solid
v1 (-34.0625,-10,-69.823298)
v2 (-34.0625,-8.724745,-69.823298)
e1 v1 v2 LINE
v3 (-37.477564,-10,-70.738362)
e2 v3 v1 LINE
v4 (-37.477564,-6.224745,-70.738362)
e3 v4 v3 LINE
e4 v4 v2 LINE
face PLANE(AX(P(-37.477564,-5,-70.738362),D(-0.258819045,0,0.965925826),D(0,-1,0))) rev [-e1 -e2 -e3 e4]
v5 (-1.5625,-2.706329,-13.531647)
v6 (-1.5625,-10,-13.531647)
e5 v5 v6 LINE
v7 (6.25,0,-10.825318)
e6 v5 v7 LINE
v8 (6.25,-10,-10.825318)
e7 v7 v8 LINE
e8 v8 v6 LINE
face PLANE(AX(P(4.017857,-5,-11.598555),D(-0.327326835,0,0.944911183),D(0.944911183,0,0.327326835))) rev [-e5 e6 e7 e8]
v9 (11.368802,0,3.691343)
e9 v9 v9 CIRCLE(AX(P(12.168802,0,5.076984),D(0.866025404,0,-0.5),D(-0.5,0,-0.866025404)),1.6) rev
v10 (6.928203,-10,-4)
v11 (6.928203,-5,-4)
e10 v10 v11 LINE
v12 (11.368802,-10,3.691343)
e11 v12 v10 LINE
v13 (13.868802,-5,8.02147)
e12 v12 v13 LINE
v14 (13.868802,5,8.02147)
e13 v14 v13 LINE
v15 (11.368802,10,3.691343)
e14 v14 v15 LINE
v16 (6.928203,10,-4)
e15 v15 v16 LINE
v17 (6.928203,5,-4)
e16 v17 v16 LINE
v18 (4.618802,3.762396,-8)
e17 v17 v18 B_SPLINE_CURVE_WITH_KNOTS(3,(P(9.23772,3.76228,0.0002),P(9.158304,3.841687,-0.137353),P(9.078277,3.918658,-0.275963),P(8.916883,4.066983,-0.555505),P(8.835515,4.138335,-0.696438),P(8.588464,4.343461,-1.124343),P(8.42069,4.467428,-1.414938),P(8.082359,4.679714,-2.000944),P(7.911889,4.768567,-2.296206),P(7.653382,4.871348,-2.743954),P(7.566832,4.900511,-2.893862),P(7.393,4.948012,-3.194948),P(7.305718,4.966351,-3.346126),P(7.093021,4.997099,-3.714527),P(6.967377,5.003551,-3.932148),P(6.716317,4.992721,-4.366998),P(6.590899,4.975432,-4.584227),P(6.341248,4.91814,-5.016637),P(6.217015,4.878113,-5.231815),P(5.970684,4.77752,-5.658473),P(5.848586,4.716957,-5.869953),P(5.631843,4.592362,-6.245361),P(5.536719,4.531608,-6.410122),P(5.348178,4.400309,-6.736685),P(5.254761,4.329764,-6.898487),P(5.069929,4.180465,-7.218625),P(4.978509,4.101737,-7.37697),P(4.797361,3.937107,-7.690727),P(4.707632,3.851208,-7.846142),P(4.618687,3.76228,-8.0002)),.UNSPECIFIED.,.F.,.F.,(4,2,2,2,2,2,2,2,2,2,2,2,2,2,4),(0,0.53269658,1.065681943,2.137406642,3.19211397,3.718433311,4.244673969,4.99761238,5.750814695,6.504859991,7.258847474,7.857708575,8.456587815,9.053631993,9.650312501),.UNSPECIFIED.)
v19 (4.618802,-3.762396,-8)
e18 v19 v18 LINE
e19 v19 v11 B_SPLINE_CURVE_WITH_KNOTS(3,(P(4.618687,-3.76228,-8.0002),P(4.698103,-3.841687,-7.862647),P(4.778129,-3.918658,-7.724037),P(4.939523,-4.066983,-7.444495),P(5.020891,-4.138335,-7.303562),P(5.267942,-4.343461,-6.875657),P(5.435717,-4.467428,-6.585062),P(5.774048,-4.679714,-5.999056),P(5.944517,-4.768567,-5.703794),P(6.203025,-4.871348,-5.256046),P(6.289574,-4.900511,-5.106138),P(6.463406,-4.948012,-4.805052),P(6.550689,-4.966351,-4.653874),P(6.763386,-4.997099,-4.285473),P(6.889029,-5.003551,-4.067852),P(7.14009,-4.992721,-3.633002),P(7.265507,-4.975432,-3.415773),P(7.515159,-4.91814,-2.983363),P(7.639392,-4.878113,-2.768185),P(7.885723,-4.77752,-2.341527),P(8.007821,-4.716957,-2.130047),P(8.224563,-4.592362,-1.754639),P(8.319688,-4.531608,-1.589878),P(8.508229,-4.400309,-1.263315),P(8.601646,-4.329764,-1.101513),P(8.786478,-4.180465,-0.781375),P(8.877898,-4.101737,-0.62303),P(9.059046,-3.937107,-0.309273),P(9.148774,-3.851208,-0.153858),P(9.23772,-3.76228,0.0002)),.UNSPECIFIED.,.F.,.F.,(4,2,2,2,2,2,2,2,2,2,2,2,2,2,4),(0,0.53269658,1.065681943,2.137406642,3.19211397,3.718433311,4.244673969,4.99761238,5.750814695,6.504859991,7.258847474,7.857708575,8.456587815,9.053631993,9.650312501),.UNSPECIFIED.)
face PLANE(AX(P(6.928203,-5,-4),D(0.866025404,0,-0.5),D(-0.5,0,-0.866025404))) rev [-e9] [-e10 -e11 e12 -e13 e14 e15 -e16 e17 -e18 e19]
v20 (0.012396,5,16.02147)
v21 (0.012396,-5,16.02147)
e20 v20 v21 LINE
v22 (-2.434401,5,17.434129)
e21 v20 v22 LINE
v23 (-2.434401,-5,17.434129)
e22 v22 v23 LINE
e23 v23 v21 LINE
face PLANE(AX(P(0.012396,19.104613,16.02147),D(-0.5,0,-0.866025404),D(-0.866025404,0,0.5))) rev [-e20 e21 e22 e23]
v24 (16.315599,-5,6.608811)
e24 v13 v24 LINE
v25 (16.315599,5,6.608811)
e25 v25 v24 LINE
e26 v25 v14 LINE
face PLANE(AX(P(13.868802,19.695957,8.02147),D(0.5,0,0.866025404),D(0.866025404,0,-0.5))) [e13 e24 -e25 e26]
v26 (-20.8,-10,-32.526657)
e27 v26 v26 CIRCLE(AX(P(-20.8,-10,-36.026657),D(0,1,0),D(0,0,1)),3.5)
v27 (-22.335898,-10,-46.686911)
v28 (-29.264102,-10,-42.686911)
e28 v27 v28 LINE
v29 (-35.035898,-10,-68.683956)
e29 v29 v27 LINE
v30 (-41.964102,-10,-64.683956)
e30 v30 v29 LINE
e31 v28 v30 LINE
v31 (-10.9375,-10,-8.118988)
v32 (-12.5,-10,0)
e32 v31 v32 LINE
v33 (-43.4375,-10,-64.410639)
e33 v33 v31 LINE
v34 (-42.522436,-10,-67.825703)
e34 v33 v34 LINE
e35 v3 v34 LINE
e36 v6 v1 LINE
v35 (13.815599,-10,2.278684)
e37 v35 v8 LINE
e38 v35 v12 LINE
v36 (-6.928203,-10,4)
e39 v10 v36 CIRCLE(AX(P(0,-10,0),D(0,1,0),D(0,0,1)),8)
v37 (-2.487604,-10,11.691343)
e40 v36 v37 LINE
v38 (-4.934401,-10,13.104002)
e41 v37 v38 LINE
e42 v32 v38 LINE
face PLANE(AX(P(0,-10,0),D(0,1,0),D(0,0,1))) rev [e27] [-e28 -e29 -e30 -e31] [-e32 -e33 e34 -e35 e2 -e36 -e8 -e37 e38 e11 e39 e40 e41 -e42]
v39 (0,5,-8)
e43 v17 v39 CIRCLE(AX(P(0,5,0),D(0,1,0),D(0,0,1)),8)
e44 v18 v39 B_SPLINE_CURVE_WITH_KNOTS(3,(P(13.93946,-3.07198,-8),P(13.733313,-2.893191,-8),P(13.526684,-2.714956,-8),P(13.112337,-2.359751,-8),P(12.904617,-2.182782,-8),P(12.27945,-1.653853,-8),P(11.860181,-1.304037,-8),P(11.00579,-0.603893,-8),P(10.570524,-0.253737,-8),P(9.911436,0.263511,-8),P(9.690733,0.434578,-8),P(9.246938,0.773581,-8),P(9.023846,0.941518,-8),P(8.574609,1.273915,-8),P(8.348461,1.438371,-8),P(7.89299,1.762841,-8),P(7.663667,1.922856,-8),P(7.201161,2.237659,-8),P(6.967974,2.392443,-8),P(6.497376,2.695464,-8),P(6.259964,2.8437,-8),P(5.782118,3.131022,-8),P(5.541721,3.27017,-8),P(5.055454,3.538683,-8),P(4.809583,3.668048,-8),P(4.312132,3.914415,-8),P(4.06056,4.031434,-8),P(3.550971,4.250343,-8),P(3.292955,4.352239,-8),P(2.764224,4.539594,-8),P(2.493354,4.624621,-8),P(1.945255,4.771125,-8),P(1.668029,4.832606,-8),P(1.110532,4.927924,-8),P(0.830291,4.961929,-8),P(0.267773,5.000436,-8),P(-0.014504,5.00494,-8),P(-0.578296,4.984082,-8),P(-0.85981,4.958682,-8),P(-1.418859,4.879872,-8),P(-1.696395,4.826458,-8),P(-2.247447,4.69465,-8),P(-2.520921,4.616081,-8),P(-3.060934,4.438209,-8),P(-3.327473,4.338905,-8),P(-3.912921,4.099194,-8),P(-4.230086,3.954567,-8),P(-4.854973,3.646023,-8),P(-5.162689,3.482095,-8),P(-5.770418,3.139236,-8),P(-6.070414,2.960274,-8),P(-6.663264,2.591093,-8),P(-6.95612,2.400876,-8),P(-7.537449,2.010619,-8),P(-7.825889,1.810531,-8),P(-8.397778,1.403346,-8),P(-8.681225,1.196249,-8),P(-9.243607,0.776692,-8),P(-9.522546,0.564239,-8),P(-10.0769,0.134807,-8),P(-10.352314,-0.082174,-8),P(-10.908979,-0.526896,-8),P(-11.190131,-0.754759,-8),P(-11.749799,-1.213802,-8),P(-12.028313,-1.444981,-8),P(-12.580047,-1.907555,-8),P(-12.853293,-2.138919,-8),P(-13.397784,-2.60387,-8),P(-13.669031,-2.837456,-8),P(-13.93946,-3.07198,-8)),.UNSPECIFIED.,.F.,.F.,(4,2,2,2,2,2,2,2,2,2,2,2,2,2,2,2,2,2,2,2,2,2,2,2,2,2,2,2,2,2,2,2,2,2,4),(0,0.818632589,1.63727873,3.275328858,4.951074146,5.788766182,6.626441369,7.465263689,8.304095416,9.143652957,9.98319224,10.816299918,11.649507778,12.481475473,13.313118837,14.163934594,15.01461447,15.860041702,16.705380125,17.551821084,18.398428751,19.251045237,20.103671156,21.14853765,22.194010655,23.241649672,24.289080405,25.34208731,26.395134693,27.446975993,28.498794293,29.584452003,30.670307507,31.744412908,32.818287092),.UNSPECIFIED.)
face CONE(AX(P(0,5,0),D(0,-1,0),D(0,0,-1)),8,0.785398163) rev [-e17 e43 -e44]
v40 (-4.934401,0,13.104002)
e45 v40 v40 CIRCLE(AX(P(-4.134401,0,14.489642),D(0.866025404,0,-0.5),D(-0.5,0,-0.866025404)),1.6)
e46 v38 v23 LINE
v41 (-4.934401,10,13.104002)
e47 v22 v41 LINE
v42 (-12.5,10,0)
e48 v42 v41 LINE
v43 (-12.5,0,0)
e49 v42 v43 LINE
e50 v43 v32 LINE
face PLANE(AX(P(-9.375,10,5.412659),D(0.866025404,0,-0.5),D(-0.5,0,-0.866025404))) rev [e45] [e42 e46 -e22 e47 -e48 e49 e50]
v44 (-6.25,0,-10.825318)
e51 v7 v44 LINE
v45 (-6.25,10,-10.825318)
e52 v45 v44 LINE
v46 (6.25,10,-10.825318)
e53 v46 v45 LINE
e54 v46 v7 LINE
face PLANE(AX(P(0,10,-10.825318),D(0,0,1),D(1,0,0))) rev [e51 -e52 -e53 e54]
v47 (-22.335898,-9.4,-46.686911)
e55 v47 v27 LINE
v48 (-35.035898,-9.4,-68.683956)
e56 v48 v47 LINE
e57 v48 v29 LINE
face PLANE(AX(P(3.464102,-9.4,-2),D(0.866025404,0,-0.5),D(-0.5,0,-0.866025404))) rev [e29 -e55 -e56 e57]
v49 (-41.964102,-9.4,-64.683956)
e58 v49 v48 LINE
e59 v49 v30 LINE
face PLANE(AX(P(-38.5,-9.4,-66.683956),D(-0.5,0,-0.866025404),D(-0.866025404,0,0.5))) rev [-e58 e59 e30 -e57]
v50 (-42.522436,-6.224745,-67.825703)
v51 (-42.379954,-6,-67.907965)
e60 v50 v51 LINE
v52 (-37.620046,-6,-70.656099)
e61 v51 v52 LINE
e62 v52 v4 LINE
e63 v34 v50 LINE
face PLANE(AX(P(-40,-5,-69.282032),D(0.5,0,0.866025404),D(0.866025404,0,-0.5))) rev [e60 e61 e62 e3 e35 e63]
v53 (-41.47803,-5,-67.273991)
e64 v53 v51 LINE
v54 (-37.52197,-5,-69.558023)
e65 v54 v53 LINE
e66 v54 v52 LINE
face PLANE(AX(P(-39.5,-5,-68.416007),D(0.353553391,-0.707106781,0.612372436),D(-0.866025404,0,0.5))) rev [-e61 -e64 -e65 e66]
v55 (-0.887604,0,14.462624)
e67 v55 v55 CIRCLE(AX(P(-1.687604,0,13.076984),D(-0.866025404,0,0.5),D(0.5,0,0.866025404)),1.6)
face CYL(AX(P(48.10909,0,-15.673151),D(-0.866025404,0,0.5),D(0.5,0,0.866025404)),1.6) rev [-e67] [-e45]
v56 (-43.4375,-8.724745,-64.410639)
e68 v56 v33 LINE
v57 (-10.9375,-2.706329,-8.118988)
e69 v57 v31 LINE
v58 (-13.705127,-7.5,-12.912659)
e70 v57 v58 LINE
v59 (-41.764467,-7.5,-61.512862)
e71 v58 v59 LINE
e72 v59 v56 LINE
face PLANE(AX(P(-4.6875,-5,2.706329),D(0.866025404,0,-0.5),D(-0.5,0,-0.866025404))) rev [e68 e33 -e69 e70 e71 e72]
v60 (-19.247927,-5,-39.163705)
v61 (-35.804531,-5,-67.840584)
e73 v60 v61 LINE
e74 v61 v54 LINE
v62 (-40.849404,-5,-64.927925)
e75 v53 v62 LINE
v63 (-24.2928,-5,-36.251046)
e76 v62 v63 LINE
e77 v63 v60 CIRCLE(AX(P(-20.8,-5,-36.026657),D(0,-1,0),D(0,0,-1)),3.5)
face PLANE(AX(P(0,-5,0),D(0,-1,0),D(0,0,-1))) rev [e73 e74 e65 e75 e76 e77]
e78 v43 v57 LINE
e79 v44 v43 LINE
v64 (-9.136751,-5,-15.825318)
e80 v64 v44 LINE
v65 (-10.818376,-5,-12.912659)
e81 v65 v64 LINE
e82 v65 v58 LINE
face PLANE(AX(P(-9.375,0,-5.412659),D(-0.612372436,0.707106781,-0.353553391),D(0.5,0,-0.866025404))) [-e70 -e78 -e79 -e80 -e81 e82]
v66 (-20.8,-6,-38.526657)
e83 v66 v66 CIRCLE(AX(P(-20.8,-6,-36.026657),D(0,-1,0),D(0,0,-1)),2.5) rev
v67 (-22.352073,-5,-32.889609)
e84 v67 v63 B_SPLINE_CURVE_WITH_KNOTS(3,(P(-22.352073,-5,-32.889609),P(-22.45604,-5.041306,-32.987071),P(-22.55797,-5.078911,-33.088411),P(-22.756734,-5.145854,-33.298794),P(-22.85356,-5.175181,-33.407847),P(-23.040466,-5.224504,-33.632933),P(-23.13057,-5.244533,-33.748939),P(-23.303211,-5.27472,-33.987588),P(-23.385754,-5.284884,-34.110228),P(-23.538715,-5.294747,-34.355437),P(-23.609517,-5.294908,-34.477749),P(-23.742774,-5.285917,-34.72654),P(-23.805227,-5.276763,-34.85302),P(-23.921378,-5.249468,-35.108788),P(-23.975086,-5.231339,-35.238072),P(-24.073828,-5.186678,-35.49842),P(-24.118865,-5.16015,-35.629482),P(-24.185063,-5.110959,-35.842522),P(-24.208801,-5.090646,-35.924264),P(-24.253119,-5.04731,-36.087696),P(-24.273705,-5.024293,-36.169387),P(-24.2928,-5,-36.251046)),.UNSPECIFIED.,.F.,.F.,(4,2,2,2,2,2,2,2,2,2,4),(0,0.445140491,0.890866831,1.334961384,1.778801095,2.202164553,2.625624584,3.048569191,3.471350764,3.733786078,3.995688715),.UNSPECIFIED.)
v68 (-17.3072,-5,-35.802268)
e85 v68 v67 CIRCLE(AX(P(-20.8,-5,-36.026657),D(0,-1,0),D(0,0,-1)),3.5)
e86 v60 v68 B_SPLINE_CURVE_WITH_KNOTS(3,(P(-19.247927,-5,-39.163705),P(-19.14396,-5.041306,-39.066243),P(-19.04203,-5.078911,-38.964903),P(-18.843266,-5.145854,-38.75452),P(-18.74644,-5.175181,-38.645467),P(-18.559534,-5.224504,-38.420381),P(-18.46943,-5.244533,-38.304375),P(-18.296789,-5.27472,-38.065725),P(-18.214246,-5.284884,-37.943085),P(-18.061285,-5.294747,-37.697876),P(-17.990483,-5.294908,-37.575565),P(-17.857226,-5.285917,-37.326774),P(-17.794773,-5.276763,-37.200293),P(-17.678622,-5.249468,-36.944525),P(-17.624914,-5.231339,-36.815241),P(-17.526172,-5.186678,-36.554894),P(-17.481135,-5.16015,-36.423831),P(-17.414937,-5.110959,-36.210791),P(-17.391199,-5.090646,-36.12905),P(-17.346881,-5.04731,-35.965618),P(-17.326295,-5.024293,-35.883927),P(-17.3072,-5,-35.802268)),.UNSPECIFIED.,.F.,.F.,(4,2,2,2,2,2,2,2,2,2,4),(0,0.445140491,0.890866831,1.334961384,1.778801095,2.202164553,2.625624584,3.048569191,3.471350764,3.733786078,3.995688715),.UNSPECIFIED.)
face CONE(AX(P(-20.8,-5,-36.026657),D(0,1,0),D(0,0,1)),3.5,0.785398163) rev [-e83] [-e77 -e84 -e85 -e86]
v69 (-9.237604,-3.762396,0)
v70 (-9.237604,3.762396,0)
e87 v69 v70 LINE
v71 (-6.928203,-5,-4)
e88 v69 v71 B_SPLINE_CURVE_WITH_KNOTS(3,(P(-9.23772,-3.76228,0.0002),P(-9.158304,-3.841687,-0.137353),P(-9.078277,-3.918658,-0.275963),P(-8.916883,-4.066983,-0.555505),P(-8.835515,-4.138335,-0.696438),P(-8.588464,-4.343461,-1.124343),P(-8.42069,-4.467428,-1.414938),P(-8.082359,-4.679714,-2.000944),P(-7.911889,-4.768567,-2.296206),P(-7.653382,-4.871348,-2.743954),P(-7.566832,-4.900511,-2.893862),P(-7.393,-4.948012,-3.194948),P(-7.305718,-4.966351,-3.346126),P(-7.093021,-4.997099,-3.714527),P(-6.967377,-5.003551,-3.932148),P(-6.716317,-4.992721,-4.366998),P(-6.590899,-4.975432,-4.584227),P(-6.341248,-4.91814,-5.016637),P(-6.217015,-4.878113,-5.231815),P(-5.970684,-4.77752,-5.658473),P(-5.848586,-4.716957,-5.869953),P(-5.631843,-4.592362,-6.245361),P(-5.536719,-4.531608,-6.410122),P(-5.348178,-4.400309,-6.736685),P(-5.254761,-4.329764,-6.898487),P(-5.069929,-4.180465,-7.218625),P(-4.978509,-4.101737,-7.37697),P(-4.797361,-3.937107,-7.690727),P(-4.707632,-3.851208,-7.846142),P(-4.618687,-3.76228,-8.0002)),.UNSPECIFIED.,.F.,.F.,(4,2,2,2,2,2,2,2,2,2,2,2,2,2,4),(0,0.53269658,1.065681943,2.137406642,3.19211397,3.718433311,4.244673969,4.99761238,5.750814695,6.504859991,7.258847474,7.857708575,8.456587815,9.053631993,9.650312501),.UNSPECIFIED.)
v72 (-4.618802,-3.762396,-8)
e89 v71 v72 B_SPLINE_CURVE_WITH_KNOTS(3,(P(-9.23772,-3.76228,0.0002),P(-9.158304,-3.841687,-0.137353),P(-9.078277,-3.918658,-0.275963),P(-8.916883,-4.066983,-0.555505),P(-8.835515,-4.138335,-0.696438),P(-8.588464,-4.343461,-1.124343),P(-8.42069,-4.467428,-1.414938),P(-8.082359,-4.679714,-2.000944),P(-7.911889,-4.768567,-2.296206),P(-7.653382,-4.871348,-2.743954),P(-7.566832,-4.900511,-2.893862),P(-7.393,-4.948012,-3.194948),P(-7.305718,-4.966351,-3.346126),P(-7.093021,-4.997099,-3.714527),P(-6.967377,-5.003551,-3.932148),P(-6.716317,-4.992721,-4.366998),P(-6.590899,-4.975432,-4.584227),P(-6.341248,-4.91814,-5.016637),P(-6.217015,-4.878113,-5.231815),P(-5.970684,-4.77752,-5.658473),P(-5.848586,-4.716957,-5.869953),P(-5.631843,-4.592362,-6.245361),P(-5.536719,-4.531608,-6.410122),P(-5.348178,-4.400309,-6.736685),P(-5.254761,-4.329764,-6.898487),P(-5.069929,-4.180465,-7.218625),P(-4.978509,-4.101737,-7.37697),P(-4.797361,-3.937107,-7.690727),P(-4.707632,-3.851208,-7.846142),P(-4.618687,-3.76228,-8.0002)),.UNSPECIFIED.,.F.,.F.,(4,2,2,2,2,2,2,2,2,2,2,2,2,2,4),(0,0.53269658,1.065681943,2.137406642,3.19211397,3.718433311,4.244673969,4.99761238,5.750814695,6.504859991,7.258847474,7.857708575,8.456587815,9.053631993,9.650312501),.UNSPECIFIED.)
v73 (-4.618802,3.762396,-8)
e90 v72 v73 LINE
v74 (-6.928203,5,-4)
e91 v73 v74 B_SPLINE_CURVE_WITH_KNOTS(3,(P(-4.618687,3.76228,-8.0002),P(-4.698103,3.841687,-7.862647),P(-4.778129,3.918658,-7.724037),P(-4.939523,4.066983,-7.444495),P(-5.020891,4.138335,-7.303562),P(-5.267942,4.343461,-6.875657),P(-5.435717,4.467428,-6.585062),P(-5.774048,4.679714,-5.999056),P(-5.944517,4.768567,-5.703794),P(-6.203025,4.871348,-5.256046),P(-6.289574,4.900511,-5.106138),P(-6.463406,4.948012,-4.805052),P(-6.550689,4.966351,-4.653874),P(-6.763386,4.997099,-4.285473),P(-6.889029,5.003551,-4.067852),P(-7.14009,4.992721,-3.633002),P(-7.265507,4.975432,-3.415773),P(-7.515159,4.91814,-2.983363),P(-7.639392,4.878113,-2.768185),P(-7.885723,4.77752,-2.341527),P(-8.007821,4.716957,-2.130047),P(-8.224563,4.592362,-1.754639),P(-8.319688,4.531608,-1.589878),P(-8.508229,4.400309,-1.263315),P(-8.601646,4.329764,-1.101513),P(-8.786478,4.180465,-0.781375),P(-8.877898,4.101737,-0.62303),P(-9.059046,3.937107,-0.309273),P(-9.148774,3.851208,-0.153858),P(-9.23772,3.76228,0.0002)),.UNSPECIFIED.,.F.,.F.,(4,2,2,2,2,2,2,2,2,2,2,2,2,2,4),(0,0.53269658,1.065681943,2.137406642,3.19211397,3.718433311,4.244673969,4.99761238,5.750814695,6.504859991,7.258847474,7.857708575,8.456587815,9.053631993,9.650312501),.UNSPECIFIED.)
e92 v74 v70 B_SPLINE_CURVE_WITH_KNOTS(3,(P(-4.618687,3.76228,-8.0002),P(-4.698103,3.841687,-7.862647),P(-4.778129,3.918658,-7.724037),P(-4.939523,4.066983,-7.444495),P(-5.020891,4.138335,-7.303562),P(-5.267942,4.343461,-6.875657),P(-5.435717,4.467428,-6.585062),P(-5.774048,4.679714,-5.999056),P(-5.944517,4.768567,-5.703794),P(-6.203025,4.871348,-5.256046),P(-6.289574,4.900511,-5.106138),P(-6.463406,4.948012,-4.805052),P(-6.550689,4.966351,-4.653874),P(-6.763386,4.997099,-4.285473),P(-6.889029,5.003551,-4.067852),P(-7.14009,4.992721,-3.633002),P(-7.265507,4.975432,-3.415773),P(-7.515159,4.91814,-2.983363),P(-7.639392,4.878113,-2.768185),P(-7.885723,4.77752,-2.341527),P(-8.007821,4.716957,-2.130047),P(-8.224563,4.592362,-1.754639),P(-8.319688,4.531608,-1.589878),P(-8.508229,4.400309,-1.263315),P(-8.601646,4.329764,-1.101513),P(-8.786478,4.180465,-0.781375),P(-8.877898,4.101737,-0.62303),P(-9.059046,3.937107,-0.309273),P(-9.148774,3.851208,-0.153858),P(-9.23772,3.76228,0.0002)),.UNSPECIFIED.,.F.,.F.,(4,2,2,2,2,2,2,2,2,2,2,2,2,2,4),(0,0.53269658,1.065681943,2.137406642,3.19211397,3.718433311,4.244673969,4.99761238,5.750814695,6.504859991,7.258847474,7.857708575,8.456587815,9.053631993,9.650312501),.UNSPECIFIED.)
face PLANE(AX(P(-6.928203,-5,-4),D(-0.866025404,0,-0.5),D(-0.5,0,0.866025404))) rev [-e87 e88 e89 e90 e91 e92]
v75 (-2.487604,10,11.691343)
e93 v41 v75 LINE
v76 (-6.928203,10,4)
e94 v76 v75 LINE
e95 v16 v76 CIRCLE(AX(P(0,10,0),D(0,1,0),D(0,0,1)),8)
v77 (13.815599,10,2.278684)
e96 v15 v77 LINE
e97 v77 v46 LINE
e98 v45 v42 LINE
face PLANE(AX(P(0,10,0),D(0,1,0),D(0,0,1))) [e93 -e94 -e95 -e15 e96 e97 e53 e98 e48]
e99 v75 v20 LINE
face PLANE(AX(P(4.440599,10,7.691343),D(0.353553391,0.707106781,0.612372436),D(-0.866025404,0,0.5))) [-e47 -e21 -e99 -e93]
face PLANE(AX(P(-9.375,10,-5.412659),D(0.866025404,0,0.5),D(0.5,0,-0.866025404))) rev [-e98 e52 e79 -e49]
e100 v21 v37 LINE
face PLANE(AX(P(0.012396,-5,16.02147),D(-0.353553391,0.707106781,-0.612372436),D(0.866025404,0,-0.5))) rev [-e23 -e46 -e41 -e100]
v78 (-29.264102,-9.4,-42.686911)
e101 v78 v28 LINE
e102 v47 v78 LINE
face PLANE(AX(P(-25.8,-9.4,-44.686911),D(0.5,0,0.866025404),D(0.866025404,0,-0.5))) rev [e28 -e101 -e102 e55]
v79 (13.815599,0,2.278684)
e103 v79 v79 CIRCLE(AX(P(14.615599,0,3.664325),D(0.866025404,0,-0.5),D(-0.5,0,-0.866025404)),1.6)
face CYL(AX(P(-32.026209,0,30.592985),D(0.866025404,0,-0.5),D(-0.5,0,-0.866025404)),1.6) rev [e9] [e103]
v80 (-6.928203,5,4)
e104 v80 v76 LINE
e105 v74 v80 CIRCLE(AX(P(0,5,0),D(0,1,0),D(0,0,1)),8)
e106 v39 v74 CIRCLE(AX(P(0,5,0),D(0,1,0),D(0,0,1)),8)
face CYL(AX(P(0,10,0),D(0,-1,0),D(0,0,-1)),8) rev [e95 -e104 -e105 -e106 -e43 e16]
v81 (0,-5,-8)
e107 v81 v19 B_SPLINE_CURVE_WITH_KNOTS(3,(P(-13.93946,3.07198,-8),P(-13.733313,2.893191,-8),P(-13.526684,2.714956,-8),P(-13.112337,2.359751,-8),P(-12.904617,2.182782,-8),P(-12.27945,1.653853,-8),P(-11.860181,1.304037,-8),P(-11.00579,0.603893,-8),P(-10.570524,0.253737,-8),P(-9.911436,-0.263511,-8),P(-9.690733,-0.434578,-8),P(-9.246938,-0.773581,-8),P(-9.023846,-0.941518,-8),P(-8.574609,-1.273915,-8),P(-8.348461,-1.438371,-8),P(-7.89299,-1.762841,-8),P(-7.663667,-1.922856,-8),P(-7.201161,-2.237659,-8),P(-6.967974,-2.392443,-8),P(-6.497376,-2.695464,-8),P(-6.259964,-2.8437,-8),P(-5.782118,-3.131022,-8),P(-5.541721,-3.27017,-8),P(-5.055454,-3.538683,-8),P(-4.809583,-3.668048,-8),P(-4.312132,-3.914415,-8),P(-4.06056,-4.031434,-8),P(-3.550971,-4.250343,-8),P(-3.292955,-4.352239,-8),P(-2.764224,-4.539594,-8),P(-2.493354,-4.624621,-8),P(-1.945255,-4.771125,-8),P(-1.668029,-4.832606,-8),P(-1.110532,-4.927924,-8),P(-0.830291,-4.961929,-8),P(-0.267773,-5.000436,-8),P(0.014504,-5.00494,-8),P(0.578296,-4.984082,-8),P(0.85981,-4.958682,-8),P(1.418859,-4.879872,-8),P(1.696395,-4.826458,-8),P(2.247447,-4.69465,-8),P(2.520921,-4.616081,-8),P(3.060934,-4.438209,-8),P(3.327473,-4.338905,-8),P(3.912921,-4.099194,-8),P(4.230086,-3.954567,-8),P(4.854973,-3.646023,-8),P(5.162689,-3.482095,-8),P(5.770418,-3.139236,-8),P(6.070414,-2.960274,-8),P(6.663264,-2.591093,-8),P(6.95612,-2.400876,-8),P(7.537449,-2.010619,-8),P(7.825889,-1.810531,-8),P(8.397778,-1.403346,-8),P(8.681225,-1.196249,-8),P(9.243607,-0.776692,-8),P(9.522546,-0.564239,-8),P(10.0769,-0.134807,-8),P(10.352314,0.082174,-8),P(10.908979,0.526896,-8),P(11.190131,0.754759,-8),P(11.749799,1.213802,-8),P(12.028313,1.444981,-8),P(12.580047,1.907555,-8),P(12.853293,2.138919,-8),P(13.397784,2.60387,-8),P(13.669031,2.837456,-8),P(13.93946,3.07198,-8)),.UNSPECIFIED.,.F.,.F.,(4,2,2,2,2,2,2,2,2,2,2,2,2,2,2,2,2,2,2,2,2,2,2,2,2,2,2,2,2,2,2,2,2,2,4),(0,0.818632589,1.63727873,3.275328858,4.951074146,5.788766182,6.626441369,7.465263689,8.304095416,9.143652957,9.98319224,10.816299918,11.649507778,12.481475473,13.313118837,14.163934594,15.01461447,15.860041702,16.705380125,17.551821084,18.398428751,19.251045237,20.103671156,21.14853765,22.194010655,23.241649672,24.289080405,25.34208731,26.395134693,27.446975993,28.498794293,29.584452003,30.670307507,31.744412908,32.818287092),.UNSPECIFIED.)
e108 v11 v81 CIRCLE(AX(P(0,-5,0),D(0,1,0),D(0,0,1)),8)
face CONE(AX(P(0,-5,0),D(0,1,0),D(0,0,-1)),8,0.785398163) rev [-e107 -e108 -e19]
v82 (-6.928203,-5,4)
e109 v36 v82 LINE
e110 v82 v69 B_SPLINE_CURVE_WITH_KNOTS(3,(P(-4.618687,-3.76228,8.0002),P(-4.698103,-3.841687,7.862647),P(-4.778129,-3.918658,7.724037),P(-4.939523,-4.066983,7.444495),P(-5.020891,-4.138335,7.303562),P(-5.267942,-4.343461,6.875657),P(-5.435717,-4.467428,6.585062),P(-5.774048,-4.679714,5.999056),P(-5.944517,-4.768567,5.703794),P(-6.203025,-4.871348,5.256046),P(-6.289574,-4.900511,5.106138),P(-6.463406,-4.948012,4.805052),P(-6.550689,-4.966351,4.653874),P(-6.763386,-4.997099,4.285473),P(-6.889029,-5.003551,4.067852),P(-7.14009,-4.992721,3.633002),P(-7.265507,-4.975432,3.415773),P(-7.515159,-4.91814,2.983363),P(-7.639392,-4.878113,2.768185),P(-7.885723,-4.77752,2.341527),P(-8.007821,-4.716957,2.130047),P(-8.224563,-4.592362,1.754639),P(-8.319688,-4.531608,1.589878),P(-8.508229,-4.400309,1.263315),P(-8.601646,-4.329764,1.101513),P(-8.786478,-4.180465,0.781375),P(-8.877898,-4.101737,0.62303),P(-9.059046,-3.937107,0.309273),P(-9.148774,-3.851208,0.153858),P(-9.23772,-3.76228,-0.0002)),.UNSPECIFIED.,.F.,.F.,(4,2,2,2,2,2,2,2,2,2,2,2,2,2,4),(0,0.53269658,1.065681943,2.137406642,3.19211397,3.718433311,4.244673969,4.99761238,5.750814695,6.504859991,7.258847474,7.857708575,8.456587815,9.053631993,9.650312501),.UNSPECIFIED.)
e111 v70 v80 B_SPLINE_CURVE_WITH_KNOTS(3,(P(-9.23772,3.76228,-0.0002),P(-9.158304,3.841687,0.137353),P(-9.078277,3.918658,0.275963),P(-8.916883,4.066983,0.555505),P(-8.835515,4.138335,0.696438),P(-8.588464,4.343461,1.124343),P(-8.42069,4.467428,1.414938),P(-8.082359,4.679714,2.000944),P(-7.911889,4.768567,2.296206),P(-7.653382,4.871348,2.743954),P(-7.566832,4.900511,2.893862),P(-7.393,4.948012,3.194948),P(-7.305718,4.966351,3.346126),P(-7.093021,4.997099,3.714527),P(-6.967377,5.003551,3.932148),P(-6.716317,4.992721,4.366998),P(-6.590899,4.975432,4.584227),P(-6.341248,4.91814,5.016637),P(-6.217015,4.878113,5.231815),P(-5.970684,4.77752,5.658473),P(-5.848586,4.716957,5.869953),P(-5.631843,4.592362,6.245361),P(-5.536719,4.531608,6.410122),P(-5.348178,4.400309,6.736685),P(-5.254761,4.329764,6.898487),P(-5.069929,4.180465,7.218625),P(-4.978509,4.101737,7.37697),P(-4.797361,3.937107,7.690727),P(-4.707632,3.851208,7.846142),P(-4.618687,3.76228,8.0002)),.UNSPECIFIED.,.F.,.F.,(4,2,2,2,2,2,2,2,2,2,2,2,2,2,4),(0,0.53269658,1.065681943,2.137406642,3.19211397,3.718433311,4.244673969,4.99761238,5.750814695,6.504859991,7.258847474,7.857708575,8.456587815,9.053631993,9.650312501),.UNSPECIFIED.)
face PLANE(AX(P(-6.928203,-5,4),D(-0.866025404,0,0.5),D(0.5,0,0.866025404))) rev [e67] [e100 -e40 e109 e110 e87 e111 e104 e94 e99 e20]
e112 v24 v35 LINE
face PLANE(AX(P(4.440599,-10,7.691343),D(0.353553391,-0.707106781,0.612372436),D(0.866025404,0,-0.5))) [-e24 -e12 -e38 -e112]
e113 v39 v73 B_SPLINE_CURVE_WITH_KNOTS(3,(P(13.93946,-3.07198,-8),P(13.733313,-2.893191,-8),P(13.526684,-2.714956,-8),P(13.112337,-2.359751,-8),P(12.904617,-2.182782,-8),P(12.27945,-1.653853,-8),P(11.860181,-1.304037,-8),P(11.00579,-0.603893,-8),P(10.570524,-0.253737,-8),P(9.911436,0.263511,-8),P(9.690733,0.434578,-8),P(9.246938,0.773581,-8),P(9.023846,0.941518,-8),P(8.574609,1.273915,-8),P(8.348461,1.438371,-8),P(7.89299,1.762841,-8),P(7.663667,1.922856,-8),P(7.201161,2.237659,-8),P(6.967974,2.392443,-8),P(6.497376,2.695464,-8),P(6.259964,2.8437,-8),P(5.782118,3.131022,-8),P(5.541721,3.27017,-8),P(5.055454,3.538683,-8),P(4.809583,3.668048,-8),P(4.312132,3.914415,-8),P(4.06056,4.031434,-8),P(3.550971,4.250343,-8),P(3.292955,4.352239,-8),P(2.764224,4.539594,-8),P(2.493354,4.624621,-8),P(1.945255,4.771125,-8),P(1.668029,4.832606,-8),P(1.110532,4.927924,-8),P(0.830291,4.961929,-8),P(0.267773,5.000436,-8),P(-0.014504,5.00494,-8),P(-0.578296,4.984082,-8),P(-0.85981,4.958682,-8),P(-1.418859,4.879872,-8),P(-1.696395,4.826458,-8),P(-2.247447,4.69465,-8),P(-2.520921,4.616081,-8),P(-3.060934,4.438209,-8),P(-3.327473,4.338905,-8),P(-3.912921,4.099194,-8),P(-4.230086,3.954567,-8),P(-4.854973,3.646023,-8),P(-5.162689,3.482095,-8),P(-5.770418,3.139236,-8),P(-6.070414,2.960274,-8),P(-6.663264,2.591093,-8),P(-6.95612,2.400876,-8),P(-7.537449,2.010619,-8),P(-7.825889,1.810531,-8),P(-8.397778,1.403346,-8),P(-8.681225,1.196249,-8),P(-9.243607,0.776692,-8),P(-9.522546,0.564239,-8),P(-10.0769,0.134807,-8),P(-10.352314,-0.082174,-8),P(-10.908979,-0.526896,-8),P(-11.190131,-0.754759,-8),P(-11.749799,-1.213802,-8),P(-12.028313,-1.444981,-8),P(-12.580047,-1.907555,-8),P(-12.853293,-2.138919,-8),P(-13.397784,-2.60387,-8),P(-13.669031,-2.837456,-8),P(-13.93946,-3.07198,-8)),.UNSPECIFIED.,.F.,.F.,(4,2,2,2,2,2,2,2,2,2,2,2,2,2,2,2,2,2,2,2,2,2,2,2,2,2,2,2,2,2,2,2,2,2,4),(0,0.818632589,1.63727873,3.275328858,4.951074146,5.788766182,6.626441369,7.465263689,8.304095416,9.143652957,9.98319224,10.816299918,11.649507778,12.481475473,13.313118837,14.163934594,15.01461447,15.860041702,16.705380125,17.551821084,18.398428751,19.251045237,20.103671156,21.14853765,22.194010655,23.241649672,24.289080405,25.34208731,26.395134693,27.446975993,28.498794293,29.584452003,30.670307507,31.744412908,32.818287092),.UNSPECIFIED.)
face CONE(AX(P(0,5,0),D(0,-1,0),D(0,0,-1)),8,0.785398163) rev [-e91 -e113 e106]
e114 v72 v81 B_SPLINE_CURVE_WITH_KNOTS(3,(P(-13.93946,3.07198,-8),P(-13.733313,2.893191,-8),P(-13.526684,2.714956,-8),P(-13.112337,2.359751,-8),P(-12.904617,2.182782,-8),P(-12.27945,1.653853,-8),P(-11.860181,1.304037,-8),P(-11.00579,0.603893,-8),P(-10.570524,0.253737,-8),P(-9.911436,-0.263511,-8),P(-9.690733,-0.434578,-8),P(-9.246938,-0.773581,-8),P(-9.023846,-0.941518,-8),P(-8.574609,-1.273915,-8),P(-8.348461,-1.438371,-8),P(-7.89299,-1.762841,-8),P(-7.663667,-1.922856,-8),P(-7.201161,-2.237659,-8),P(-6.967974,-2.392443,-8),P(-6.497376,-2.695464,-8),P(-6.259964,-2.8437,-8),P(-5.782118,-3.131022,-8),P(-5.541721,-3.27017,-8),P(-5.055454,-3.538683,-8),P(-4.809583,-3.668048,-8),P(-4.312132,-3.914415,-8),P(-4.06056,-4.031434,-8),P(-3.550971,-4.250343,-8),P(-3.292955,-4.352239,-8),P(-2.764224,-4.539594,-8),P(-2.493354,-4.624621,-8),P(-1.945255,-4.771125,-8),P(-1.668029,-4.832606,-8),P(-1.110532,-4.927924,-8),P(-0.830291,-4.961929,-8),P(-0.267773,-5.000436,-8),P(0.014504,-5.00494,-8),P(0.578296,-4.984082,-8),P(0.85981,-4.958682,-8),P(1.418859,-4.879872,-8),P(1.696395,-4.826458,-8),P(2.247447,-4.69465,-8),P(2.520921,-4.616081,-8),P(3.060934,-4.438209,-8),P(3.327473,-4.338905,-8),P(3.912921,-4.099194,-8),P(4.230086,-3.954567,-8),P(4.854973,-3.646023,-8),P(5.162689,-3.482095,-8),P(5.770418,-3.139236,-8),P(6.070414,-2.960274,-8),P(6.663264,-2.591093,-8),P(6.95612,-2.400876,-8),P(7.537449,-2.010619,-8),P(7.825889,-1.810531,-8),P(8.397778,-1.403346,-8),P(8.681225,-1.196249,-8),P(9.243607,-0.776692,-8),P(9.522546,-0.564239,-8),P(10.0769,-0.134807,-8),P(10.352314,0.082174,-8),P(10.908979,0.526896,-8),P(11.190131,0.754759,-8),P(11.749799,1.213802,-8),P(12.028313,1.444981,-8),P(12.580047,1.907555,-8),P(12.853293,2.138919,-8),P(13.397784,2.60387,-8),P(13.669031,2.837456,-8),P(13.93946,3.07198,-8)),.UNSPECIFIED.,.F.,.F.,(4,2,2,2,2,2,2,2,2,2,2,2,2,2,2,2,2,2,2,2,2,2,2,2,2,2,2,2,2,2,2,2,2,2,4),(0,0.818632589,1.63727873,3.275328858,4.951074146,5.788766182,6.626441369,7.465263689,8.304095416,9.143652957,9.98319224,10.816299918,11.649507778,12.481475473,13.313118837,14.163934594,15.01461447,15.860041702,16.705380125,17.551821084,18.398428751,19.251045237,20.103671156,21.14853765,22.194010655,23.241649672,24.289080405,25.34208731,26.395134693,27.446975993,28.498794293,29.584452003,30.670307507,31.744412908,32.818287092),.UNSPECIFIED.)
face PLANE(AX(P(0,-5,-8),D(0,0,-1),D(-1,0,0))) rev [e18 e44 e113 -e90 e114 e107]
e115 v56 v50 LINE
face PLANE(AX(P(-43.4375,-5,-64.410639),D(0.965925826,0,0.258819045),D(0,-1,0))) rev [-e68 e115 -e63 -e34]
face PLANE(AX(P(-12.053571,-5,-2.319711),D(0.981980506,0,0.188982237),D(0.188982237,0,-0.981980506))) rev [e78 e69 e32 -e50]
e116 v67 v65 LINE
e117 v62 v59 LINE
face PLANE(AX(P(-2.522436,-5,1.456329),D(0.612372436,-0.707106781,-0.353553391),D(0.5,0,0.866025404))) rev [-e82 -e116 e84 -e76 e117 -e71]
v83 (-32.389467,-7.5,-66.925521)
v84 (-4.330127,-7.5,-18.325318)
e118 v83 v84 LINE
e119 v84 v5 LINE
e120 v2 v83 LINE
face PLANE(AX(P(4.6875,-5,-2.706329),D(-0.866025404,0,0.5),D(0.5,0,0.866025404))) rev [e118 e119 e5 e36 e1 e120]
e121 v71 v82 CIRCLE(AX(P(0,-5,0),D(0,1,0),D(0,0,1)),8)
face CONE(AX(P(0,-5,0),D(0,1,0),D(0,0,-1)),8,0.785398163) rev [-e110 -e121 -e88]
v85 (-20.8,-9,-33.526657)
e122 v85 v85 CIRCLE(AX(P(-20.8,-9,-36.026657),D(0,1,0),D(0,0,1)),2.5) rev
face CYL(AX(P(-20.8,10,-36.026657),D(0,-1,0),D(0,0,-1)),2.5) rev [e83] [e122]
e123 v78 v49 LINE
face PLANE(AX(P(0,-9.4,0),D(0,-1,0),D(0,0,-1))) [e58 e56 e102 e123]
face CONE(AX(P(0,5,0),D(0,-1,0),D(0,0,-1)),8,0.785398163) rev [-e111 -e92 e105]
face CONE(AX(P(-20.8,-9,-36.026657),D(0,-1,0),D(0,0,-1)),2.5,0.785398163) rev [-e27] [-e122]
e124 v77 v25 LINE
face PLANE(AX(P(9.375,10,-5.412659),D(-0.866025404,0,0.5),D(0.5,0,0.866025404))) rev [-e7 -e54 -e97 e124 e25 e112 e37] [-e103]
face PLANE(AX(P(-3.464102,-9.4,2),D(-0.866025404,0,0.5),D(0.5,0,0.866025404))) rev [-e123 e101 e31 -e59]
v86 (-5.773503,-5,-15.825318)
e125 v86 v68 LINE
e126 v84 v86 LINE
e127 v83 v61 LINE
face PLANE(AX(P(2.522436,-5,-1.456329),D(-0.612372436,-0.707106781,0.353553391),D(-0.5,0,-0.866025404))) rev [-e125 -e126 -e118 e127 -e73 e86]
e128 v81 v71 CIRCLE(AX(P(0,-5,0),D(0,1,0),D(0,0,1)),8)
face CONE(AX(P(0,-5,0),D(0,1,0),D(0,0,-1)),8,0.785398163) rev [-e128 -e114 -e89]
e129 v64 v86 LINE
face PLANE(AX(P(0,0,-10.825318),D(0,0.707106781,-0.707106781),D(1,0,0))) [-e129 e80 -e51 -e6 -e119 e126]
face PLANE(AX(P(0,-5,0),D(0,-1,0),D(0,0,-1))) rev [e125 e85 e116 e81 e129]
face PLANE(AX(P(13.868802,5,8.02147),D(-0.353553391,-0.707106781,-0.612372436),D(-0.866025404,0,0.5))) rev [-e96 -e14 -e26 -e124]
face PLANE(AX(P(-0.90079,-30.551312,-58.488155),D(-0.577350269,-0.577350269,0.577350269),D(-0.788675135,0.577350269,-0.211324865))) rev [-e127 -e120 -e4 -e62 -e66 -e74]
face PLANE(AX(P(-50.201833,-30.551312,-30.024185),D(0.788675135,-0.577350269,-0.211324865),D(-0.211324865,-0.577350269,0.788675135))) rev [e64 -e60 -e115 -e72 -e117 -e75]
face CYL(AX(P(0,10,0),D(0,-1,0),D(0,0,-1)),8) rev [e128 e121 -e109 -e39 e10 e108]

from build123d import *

# Parameters (mm, degrees)
SKETCH1_R                = 8
BOSS_EXTRUDE1_DEPTH      = 10
SKETCH1_3_R              = 8
CUT_EXTRUDE3_DEPTH       = 5
CUT_EXTRUDE6_DEPTH       = 20.324531042175384
CUT_EXTRUDE6_DEPTH_BACK  = 20.324531042175384
BOSS_EXTRUDE2_DEPTH      = 5
CHAMFER1_SIZE            = 5
CHAMFER2_SIZE            = 2.5
CHAMFER3_SIZE            = 2.5
CHAMFER4_SIZE            = 1
CHAMFER4_EDGE_2_SIZE     = 1
CHAMFER4_EDGE_2_SIZE2    = 2.7320508075695416
CHAMFER4_EDGE_3_SIZE     = 1
CHAMFER4_EDGE_3_SIZE2    = 2.7320508075682537
CUT_EXTRUDE7_DEPTH       = 0.6
SKETCH5_3_R              = 2.499999999999999
CUT_EXTRUDE8_DEPTH       = 86.3857846528101
CHAMFER5_SIZE            = 1
BOSS_EXTRUDE3_DEPTH      = 20
CHAMFER6_SIZE            = 5
CUT_EXTRUDE9_REACH       = 86.597
SKETCH7_R                = 1.6000000000000019
CHAMFER6_OF_MIRROR2_SIZE = 5


with BuildPart() as part:
    # Sketch1 → Boss-Extrude1 (new, symmetric)
    with BuildSketch(Plane(origin=(0, 0, 0), x_dir=(1, 0, 0), z_dir=(0, 1, 0))):
        Polygon((-12.5, 3.33e-15), (-6.249999999999997, -10.825317547305481), (6.249999999999998, -10.825317547305481), (12.499999999999995, 2.3e-15), (6.249999999999995, 10.825317547305485), (-6.249999999999999, 10.825317547305483), align=None)
        with Locations(Location((0, 0, 0), (0, 0, 270))):
            Circle(SKETCH1_R, mode=Mode.SUBTRACT)
    extrude(amount=BOSS_EXTRUDE1_DEPTH, both=True)

    # Sketch1<3> → Cut-Extrude3 (cut, symmetric)
    with BuildSketch(Plane(origin=(0, 0, 0), x_dir=(1, 0, 0), z_dir=(0, 1, 0))):
        with BuildLine():
            Line((9.237604307034013, 3.47e-15), (6.928203158180938, 4.000000124871458))
            ThreePointArc((6.928203158180937, 4.000000124871459), (7.727406591653098, 2.070552430458174), (8, 0))
            ThreePointArc((8, -1.96e-15), (7.727406617827326, -2.070552332774626), (6.92820325931039, -3.999999949710111))
            Line((6.92820325931039, -3.999999949710112), (9.237604307034013, 3.55e-15))
        make_face()
        with BuildLine():
            Line((6.928203158180938, 4.000000124871458), (4.6188021535170005, 7.999999999999998))
            Line((4.6188021535170005, 7.999999999999998), (-9.11633347e-09, 7.999999999999998))
            ThreePointArc((-9.11633386e-09, 8), (3.999999933616783, 6.9282032686018775), (6.928203158180937, 4.000000124871459))
        make_face()
        with BuildLine():
            ThreePointArc((-6.928203259310827, 3.9999999497093532), (-4.000000029092812, 6.928203213478766), (-9.11633386e-09, 8))
            Line((-9.11633347e-09, 7.999999999999998), (-4.618802153517008, 7.999999999999998))
            Line((-4.618802153517007, 7.999999999999998), (-6.928203259310829, 3.999999949709351))
        make_face()
        with BuildLine():
            ThreePointArc((-6.9282031729355795, -4.0000000993156695), (-7.999999999999999, -8.637524731e-08), (-6.928203259310827, 3.9999999497093532))
            Line((-6.928203259310829, 3.999999949709351), (-9.237604307034013, -1.78e-15))
            Line((-9.237604307034013, -1.73e-15), (-6.9282031729355795, -4.0000000993156695))
        make_face()
        with BuildLine():
            ThreePointArc((1.7617e-13, -8), (-3.9999999503420853, -6.928203258945519), (-6.9282031729355795, -4.0000000993156695))
            Line((-6.9282031729355795, -4.0000000993156695), (-4.6188021535170005, -8.000000000000002))
            Line((-4.6188021535170005, -8.000000000000002), (1.7586e-13, -8))
        make_face()
        with BuildLine():
            Line((4.6188021535170085, -7.999999999999998), (6.92820325931039, -3.999999949710112))
            ThreePointArc((6.92820325931039, -3.999999949710111), (4.000000025145024, -6.928203215758023), (1.7617e-13, -8))
            Line((1.7586e-13, -8), (4.618802153517008, -7.999999999999998))
        make_face()
        with Locations(Location((0, 0, 0), (0, 0, 270))):
            Circle(SKETCH1_3_R)
    extrude(amount=CUT_EXTRUDE3_DEPTH, both=True, mode=Mode.SUBTRACT)

    # Sketch2 → Revolve1 (revolve)
    with BuildSketch(Plane(origin=(0, 0, 0), x_dir=(0, 0, -1), z_dir=(1, 0, 0))):
        Polygon((9.239999999999998, 10), (8, 10), (8, 5.000000000000001), (9.24, 3.75999999999999), align=None)
    revolve1 = revolve(axis=Axis((0, 0, 0), (0, 1, 0)))

    # Mirror1: Revolve1 across plane
    add(revolve1.mirror(Plane.ZX))

    # Sketch3 → Cut-Extrude6 (cut, two sides: drawn at the far end of the back side and taken through both)
    with BuildSketch(Plane(origin=(0, 0, 0), x_dir=(1, 0, 0), z_dir=(0, 1, 0)).offset(-CUT_EXTRUDE6_DEPTH_BACK)):
        Polygon((-6.928203230275505, -4.0000000000000036), (6.928203230275509, 4), (13.370436636375942, -7.158275573583455), (-0.48596982417507123, -15.158275573583454), align=None)
    extrude(amount=CUT_EXTRUDE6_DEPTH + CUT_EXTRUDE6_DEPTH_BACK, mode=Mode.SUBTRACT)

    # Sketch4 → Boss-Extrude2 (add)
    with BuildSketch(Plane(origin=(0, -10, 0), x_dir=(-1, 0, 0), z_dir=(0, -1, 0))):
        Polygon((-6.249999999999994, 10.825317547305485), (3.55e-15, 10.825317547305483), (1.5625000000000036, 13.531646934131857), align=None)
        Polygon((1.5625000000000036, 13.531646934131857), (3.47e-15, 10.825317547305483), (6.249999999999999, 10.825317547305483), align=None)
        Polygon((35.31249999999998, 71.98836168958148), (1.5625000000000036, 13.531646934131857), (6.249999999999999, 10.825317547305485), (10.937499999999998, 8.11898816047911), (44.68750000000001, 66.57570291592872), align=None)
        Polygon((10.937499999999998, 8.11898816047911), (6.249999999999999, 10.825317547305485), (9.375, 5.412658773652744), align=None)
        Polygon((10.9375, 8.11898816047912), (9.375, 5.412658773652751), (12.500000000000002, 3.55e-15), align=None)
    extrude(amount=-BOSS_EXTRUDE2_DEPTH)

    # Chamfer1
    # the kernel refuses this chamfer: 5 mm, written as the material it adds along each edge
    with BuildSketch(Plane(origin=(19.108414939829547, -5, -10.825317547305485), x_dir=(0, 1, 3.6e-16), z_dir=(-1, 0, 0))) as chamfer1_piece_1_section:
        Polygon((CHAMFER1_SIZE, 0), (-1.78e-15, CHAMFER1_SIZE), (0, 0), align=None)
    chamfer1_piece_1 = extrude(amount=38.2168298796591, mode=Mode.PRIVATE)
    chamfer1_piece_1 = split(chamfer1_piece_1, bisect_by=Plane(origin=(0.08960373495738594, -5, -21.8058333161051), z_dir=(0.8660254037844386, 0, 0.5000000000000002)), keep=Keep.TOP, mode=Mode.PRIVATE)
    chamfer1_piece_1 = split(chamfer1_piece_1, bisect_by=Plane(origin=(4.777103734957368, -5, -2.551131165332242), z_dir=(-0.8660254037844389, 0, 0.49999999999999956)), keep=Keep.TOP, mode=Mode.PRIVATE)
    add(chamfer1_piece_1)
    with BuildSketch(Plane(origin=(19.108414939829547, -5, -10.825317547305485), x_dir=(0, 1, 3.6e-16), z_dir=(-1, 0, 0))) as chamfer1_piece_2_section:
        Polygon((CHAMFER1_SIZE, 0), (-1.78e-15, CHAMFER1_SIZE), (0, 0), align=None)
    chamfer1_piece_2 = extrude(amount=38.2168298796591, mode=Mode.PRIVATE)
    chamfer1_piece_2 = split(chamfer1_piece_2, bisect_by=Plane(origin=(17.730727624847805, -5, -6.848276836486285), z_dir=(-0.32732683535398893, 0, 0.9449111825230679)), keep=Keep.TOP, mode=Mode.PRIVATE)
    chamfer1_piece_2 = split(chamfer1_piece_2, bisect_by=Plane(origin=(4.777103734957372, -5, -2.5511311653322437), z_dir=(0.8660254037844389, 0, -0.49999999999999956)), keep=Keep.TOP, mode=Mode.PRIVATE)
    add(chamfer1_piece_2)
    with BuildSketch(Plane(origin=(19.108414939829547, -5, -10.825317547305485), x_dir=(0, 1, 3.6e-16), z_dir=(-1, 0, 0))) as chamfer1_piece_3_section:
        Polygon((CHAMFER1_SIZE, 0), (-1.78e-15, CHAMFER1_SIZE), (0, 0), align=None)
    chamfer1_piece_3 = extrude(amount=38.2168298796591, mode=Mode.PRIVATE)
    chamfer1_piece_3 = split(chamfer1_piece_3, bisect_by=Plane(origin=(17.730727624847805, -5, -6.848276836486285), z_dir=(0.32732683535398893, 0, -0.9449111825230679)), keep=Keep.TOP, mode=Mode.PRIVATE)
    chamfer1_piece_3 = split(chamfer1_piece_3, bisect_by=Plane(origin=(4.777103734957368, -5, -2.551131165332242), z_dir=(-0.8660254037844389, 0, 0.49999999999999956)), keep=Keep.TOP, mode=Mode.PRIVATE)
    add(chamfer1_piece_3)
    with BuildSketch(Plane(origin=(-18.929207469914783, -5, 11.135713990293745), x_dir=(1.5e-16, 1, 9e-17), z_dir=(0.5000000000000003, 0, -0.8660254037844386))) as chamfer1_piece_4_section:
        Polygon((CHAMFER1_SIZE, 0), (-8.9e-16, -CHAMFER1_SIZE), (0, 0), align=None)
    chamfer1_piece_4 = extrude(amount=38.216829879659116, mode=Mode.PRIVATE)
    chamfer1_piece_4 = split(chamfer1_piece_4, bisect_by=Plane(origin=(-18.929207469914786, -5, -10.825317547305481), z_dir=(1.4e-16, 0, 1)), keep=Keep.TOP, mode=Mode.PRIVATE)
    chamfer1_piece_4 = split(chamfer1_piece_4, bisect_by=Plane(origin=(-4.597896265042607, -5, 2.8615276083204897), z_dir=(0.8660254037844386, 0, -0.5000000000000002)), keep=Keep.TOP, mode=Mode.PRIVATE)
    add(chamfer1_piece_4)
    with BuildSketch(Plane(origin=(-18.929207469914783, -5, 11.135713990293745), x_dir=(1.5e-16, 1, 9e-17), z_dir=(0.5000000000000003, 0, -0.8660254037844386))) as chamfer1_piece_5_section:
        Polygon((CHAMFER1_SIZE, 0), (-8.9e-16, -CHAMFER1_SIZE), (0, 0), align=None)
    chamfer1_piece_5 = extrude(amount=38.216829879659116, mode=Mode.PRIVATE)
    chamfer1_piece_5 = split(chamfer1_piece_5, bisect_by=Plane(origin=(-14.796145524969571, -5, 11.931122132457586), z_dir=(0.9819805060619656, 0, 0.18898223650461415)), keep=Keep.TOP, mode=Mode.PRIVATE)
    chamfer1_piece_5 = split(chamfer1_piece_5, bisect_by=Plane(origin=(-4.597896265042607, -5, 2.8615276083204897), z_dir=(-0.8660254037844386, 0, 0.5000000000000002)), keep=Keep.TOP, mode=Mode.PRIVATE)
    add(chamfer1_piece_5)
    with BuildSketch(Plane(origin=(-18.929207469914783, -5, 11.135713990293745), x_dir=(1.5e-16, 1, 9e-17), z_dir=(0.5000000000000003, 0, -0.8660254037844386))) as chamfer1_piece_6_section:
        Polygon((CHAMFER1_SIZE, 0), (-8.9e-16, -CHAMFER1_SIZE), (0, 0), align=None)
    chamfer1_piece_6 = extrude(amount=38.216829879659116, mode=Mode.PRIVATE)
    chamfer1_piece_6 = split(chamfer1_piece_6, bisect_by=Plane(origin=(-14.796145524969573, -5, 11.931122132457585), z_dir=(-0.9819805060619656, 0, -0.18898223650461415)), keep=Keep.TOP, mode=Mode.PRIVATE)
    chamfer1_piece_6 = split(chamfer1_piece_6, bisect_by=Plane(origin=(-4.597896265042609, -5, 2.8615276083204915), z_dir=(0.8660254037844386, 0, -0.5000000000000002)), keep=Keep.TOP, mode=Mode.PRIVATE)
    add(chamfer1_piece_6)
    with BuildSketch(Plane(origin=(-18.929207469914783, -5, 11.135713990293745), x_dir=(1.5e-16, 1, 9e-17), z_dir=(0.5000000000000003, 0, -0.8660254037844386))) as chamfer1_piece_7a_section:
        Polygon((CHAMFER1_SIZE, 0), (-8.9e-16, -CHAMFER1_SIZE), (0, 0), align=None)
    chamfer1_piece_7a = extrude(amount=38.216829879659116, mode=Mode.PRIVATE)
    chamfer1_piece_7a = split(chamfer1_piece_7a, bisect_by=Plane(origin=(-14.796145524969571, -5, 11.931122132457586), z_dir=(0.9819805060619656, 0, 0.18898223650461415)), keep=Keep.TOP, mode=Mode.PRIVATE)
    chamfer1_piece_7a = split(chamfer1_piece_7a, bisect_by=Plane(origin=(-18.929207469914786, -5, -10.825317547305477), z_dir=(-1.4e-16, 0, -1)), keep=Keep.TOP, mode=Mode.PRIVATE)
    chamfer1_piece_7a = split(chamfer1_piece_7a, bisect_by=Plane(origin=(4.777103734957382, -5, -2.551131165332224), z_dir=(-0.8660254037844389, 0, 0.49999999999999956)), keep=Keep.TOP, mode=Mode.PRIVATE)
    with BuildSketch(Plane(origin=(19.108414939829547, -5, -10.825317547305485), x_dir=(0, 1, 3.6e-16), z_dir=(-1, 0, 0))) as chamfer1_piece_7b_section:
        Polygon((CHAMFER1_SIZE, 0), (-1.78e-15, CHAMFER1_SIZE), (0, 0), align=None)
    chamfer1_piece_7b = extrude(amount=38.2168298796591, mode=Mode.PRIVATE)
    chamfer1_piece_7b = split(chamfer1_piece_7b, bisect_by=Plane(origin=(0.08960373495739304, -5, -21.8058333161051), z_dir=(-0.8660254037844386, 0, -0.5000000000000002)), keep=Keep.TOP, mode=Mode.PRIVATE)
    chamfer1_piece_7b = split(chamfer1_piece_7b, bisect_by=Plane(origin=(-4.597896265042607, -5, 2.8615276083205003), z_dir=(0.8660254037844386, 0, -0.5000000000000002)), keep=Keep.TOP, mode=Mode.PRIVATE)
    chamfer1_piece_7b = split(chamfer1_piece_7b, bisect_by=Plane(origin=(17.730727624847805, -5, -6.848276836486287), z_dir=(-0.32732683535398893, 0, 0.9449111825230679)), keep=Keep.TOP, mode=Mode.PRIVATE)
    chamfer1_piece_7 = chamfer1_piece_7a & chamfer1_piece_7b
    add(chamfer1_piece_7)

    # Chamfer2
    chamfer2_edges = [part.edges().sort_by_distance(p)[0] for p in [
        (-28.47462567297219, -5, -38.49418084478748),
        (-19.09962567297447, -5, -43.906839618444195),
    ]]
    chamfer(chamfer2_edges, length=CHAMFER2_SIZE)

    # Chamfer3
    chamfer3_edges = [part.edges().sort_by_distance(p)[0] for p in [
        (-35.31249999999998, -8.75, -71.98836168958148),
        (-44.68750000000001, -8.75, -66.57570291592872),
    ]]
    chamfer(chamfer3_edges, length=CHAMFER3_SIZE)

    # Chamfer4
    chamfer4_edges = [part.edges().sort_by_distance(p)[0] for p in [
        (-40.00000000001547, -5, -69.28203230274616),
    ]]
    chamfer(chamfer4_edges, length=CHAMFER4_SIZE)

    # Chamfer4 edge 2
    chamfer4_edge_2_edges = [part.edges().sort_by_distance(p)[0] for p in [
        (-35.770031754746036, -6.24999999999993, -70.28082993484206),
    ]]
    chamfer4_edge_2_side = [part.faces().sort_by_distance(p)[0] for p in [
        (-35.959757505271654, -8.055555555555529, -70.33166679647876),
    ]]
    chamfer(chamfer4_edge_2_edges, length=CHAMFER4_EDGE_2_SIZE, length2=CHAMFER4_EDGE_2_SIZE2, reference=chamfer4_edge_2_side[0])

    # Chamfer4 edge 3
    chamfer4_edge_3_edges = [part.edges().sort_by_distance(p)[0] for p in [
        (-42.979968245284546, -6.250000000000065, -66.11817116118938),
    ]]
    chamfer4_edge_3_side = [part.faces().sort_by_distance(p)[0] for p in [
        (-42.929131383647835, -8.055555555555578, -66.30789691171502),
    ]]
    chamfer(chamfer4_edge_3_edges, length=CHAMFER4_EDGE_3_SIZE, length2=CHAMFER4_EDGE_3_SIZE2, reference=chamfer4_edge_3_side[0])

    # Sketch5 → Cut-Extrude7 (cut)
    with BuildSketch(Plane.XZ.offset(10)):
        Polygon((-22.33589838486227, -46.686910835277054), (-29.264101615137765, -42.68691083527706), (-41.96410161513777, -64.6839560914018), (-35.03589838486225, -68.68395609140181), align=None)
    extrude(amount=-CUT_EXTRUDE7_DEPTH, mode=Mode.SUBTRACT)

    # Sketch5<3> → Cut-Extrude8 (cut, through all)
    with BuildSketch(Plane.XZ.offset(10)):
        with Locations(Location((-20.800000000000015, -36.026656797432665, 0), (0, 0, 270))):
            Circle(SKETCH5_3_R)
    extrude(amount=-CUT_EXTRUDE8_DEPTH, mode=Mode.SUBTRACT)

    # Chamfer5
    # the kernel refuses this chamfer: 1 mm, written as the material it takes off along each edge
    with BuildSketch(Plane(origin=(-20.800000000000015, -5, -36.026656797432665), x_dir=(0, 0, -1), z_dir=(-1, 0, 0))) as chamfer5_piece_1:
        Polygon((2.5 + CHAMFER5_SIZE, 0), (2.5, CHAMFER5_SIZE), (2.5, 0), align=None)
    revolve(axis=Axis((-20.800000000000015, -5, -36.026656797432665), (0, -1, 0)), mode=Mode.SUBTRACT)
    with BuildSketch(Plane(origin=(-20.800000000000015, -10, -36.026656797432665), x_dir=(0, 0, -1), z_dir=(-1, 0, 0))) as chamfer5_piece_2:
        Polygon((2.5 + CHAMFER5_SIZE, 0), (2.5, -CHAMFER5_SIZE), (2.5, 0), align=None)
    revolve(axis=Axis((-20.800000000000015, -10, -36.026656797432665), (0, -1, 0)), mode=Mode.SUBTRACT)

    # Sketch6 → Boss-Extrude3 (add)
    with BuildSketch(Plane(origin=(0, -10, 0), x_dir=(-1, 0, 0), z_dir=(0, -1, 0))):
        Polygon((-10.868802153517006, -2.8253175473054815), (-13.868802153517004, -8.021469970012113), (-16.315598923241495, -6.608811196359374), (-12.499999999999995, 1.73e-15), align=None)
    boss_extrude3 = extrude(amount=-BOSS_EXTRUDE3_DEPTH)

    # Chamfer6
    chamfer6_edges = [part.edges().sort_by_distance(p)[0] for p in [
        (15.092200538379249, -10, 7.315140583185744),
        (15.092200538379249, 10, 7.315140583185744),
    ]]
    chamfer(chamfer6_edges, length=CHAMFER6_SIZE)

    # Sketch7 → Cut-Extrude9 (cut, up to next)
    with BuildSketch(Plane(origin=(9.374999999999996, 0, -5.4126587736527405), x_dir=(-0.5000000000000001, 0, -0.8660254037844386), z_dir=(0.8660254037844386, 0, -0.5000000000000001)), mode=Mode.PRIVATE) as cut_extrude9_sk1:
        with Locations((-10.481197846482983, 0)):
            Circle(SKETCH7_R)
    cut_extrude9_tool1 = extrude(cut_extrude9_sk1.sketch, amount=-CUT_EXTRUDE9_REACH, mode=Mode.PRIVATE) & part.part
    cut_extrude9 = cut_extrude9_tool1.solids().sort_by_distance((14.615599, 0, 3.664325))[0]
    add(cut_extrude9, mode=Mode.SUBTRACT)

    # Mirror2: Boss-Extrude3, Cut-Extrude9 across plane
    add(boss_extrude3.mirror(Plane(origin=(0, 0, 0), x_dir=(0.5000000000000001, 0, 0.8660254037844386), z_dir=(0.8660254037844386, 0, -0.5000000000000001))))
    add(cut_extrude9.mirror(Plane(origin=(0, 0, 0), x_dir=(0.5000000000000001, 0, 0.8660254037844386), z_dir=(0.8660254037844386, 0, -0.5000000000000001))), mode=Mode.SUBTRACT)

    # Chamfer6 of Mirror2
    chamfer6_of_mirror2_edges = [part.edges().sort_by_distance(p)[0] for p in [
        (-1.211002691896252, -10, 16.727799356838485),
        (-1.211002691896252, 10, 16.727799356838485),
    ]]
    chamfer(chamfer6_of_mirror2_edges, length=CHAMFER6_OF_MIRROR2_SIZE)


solid = part.part
